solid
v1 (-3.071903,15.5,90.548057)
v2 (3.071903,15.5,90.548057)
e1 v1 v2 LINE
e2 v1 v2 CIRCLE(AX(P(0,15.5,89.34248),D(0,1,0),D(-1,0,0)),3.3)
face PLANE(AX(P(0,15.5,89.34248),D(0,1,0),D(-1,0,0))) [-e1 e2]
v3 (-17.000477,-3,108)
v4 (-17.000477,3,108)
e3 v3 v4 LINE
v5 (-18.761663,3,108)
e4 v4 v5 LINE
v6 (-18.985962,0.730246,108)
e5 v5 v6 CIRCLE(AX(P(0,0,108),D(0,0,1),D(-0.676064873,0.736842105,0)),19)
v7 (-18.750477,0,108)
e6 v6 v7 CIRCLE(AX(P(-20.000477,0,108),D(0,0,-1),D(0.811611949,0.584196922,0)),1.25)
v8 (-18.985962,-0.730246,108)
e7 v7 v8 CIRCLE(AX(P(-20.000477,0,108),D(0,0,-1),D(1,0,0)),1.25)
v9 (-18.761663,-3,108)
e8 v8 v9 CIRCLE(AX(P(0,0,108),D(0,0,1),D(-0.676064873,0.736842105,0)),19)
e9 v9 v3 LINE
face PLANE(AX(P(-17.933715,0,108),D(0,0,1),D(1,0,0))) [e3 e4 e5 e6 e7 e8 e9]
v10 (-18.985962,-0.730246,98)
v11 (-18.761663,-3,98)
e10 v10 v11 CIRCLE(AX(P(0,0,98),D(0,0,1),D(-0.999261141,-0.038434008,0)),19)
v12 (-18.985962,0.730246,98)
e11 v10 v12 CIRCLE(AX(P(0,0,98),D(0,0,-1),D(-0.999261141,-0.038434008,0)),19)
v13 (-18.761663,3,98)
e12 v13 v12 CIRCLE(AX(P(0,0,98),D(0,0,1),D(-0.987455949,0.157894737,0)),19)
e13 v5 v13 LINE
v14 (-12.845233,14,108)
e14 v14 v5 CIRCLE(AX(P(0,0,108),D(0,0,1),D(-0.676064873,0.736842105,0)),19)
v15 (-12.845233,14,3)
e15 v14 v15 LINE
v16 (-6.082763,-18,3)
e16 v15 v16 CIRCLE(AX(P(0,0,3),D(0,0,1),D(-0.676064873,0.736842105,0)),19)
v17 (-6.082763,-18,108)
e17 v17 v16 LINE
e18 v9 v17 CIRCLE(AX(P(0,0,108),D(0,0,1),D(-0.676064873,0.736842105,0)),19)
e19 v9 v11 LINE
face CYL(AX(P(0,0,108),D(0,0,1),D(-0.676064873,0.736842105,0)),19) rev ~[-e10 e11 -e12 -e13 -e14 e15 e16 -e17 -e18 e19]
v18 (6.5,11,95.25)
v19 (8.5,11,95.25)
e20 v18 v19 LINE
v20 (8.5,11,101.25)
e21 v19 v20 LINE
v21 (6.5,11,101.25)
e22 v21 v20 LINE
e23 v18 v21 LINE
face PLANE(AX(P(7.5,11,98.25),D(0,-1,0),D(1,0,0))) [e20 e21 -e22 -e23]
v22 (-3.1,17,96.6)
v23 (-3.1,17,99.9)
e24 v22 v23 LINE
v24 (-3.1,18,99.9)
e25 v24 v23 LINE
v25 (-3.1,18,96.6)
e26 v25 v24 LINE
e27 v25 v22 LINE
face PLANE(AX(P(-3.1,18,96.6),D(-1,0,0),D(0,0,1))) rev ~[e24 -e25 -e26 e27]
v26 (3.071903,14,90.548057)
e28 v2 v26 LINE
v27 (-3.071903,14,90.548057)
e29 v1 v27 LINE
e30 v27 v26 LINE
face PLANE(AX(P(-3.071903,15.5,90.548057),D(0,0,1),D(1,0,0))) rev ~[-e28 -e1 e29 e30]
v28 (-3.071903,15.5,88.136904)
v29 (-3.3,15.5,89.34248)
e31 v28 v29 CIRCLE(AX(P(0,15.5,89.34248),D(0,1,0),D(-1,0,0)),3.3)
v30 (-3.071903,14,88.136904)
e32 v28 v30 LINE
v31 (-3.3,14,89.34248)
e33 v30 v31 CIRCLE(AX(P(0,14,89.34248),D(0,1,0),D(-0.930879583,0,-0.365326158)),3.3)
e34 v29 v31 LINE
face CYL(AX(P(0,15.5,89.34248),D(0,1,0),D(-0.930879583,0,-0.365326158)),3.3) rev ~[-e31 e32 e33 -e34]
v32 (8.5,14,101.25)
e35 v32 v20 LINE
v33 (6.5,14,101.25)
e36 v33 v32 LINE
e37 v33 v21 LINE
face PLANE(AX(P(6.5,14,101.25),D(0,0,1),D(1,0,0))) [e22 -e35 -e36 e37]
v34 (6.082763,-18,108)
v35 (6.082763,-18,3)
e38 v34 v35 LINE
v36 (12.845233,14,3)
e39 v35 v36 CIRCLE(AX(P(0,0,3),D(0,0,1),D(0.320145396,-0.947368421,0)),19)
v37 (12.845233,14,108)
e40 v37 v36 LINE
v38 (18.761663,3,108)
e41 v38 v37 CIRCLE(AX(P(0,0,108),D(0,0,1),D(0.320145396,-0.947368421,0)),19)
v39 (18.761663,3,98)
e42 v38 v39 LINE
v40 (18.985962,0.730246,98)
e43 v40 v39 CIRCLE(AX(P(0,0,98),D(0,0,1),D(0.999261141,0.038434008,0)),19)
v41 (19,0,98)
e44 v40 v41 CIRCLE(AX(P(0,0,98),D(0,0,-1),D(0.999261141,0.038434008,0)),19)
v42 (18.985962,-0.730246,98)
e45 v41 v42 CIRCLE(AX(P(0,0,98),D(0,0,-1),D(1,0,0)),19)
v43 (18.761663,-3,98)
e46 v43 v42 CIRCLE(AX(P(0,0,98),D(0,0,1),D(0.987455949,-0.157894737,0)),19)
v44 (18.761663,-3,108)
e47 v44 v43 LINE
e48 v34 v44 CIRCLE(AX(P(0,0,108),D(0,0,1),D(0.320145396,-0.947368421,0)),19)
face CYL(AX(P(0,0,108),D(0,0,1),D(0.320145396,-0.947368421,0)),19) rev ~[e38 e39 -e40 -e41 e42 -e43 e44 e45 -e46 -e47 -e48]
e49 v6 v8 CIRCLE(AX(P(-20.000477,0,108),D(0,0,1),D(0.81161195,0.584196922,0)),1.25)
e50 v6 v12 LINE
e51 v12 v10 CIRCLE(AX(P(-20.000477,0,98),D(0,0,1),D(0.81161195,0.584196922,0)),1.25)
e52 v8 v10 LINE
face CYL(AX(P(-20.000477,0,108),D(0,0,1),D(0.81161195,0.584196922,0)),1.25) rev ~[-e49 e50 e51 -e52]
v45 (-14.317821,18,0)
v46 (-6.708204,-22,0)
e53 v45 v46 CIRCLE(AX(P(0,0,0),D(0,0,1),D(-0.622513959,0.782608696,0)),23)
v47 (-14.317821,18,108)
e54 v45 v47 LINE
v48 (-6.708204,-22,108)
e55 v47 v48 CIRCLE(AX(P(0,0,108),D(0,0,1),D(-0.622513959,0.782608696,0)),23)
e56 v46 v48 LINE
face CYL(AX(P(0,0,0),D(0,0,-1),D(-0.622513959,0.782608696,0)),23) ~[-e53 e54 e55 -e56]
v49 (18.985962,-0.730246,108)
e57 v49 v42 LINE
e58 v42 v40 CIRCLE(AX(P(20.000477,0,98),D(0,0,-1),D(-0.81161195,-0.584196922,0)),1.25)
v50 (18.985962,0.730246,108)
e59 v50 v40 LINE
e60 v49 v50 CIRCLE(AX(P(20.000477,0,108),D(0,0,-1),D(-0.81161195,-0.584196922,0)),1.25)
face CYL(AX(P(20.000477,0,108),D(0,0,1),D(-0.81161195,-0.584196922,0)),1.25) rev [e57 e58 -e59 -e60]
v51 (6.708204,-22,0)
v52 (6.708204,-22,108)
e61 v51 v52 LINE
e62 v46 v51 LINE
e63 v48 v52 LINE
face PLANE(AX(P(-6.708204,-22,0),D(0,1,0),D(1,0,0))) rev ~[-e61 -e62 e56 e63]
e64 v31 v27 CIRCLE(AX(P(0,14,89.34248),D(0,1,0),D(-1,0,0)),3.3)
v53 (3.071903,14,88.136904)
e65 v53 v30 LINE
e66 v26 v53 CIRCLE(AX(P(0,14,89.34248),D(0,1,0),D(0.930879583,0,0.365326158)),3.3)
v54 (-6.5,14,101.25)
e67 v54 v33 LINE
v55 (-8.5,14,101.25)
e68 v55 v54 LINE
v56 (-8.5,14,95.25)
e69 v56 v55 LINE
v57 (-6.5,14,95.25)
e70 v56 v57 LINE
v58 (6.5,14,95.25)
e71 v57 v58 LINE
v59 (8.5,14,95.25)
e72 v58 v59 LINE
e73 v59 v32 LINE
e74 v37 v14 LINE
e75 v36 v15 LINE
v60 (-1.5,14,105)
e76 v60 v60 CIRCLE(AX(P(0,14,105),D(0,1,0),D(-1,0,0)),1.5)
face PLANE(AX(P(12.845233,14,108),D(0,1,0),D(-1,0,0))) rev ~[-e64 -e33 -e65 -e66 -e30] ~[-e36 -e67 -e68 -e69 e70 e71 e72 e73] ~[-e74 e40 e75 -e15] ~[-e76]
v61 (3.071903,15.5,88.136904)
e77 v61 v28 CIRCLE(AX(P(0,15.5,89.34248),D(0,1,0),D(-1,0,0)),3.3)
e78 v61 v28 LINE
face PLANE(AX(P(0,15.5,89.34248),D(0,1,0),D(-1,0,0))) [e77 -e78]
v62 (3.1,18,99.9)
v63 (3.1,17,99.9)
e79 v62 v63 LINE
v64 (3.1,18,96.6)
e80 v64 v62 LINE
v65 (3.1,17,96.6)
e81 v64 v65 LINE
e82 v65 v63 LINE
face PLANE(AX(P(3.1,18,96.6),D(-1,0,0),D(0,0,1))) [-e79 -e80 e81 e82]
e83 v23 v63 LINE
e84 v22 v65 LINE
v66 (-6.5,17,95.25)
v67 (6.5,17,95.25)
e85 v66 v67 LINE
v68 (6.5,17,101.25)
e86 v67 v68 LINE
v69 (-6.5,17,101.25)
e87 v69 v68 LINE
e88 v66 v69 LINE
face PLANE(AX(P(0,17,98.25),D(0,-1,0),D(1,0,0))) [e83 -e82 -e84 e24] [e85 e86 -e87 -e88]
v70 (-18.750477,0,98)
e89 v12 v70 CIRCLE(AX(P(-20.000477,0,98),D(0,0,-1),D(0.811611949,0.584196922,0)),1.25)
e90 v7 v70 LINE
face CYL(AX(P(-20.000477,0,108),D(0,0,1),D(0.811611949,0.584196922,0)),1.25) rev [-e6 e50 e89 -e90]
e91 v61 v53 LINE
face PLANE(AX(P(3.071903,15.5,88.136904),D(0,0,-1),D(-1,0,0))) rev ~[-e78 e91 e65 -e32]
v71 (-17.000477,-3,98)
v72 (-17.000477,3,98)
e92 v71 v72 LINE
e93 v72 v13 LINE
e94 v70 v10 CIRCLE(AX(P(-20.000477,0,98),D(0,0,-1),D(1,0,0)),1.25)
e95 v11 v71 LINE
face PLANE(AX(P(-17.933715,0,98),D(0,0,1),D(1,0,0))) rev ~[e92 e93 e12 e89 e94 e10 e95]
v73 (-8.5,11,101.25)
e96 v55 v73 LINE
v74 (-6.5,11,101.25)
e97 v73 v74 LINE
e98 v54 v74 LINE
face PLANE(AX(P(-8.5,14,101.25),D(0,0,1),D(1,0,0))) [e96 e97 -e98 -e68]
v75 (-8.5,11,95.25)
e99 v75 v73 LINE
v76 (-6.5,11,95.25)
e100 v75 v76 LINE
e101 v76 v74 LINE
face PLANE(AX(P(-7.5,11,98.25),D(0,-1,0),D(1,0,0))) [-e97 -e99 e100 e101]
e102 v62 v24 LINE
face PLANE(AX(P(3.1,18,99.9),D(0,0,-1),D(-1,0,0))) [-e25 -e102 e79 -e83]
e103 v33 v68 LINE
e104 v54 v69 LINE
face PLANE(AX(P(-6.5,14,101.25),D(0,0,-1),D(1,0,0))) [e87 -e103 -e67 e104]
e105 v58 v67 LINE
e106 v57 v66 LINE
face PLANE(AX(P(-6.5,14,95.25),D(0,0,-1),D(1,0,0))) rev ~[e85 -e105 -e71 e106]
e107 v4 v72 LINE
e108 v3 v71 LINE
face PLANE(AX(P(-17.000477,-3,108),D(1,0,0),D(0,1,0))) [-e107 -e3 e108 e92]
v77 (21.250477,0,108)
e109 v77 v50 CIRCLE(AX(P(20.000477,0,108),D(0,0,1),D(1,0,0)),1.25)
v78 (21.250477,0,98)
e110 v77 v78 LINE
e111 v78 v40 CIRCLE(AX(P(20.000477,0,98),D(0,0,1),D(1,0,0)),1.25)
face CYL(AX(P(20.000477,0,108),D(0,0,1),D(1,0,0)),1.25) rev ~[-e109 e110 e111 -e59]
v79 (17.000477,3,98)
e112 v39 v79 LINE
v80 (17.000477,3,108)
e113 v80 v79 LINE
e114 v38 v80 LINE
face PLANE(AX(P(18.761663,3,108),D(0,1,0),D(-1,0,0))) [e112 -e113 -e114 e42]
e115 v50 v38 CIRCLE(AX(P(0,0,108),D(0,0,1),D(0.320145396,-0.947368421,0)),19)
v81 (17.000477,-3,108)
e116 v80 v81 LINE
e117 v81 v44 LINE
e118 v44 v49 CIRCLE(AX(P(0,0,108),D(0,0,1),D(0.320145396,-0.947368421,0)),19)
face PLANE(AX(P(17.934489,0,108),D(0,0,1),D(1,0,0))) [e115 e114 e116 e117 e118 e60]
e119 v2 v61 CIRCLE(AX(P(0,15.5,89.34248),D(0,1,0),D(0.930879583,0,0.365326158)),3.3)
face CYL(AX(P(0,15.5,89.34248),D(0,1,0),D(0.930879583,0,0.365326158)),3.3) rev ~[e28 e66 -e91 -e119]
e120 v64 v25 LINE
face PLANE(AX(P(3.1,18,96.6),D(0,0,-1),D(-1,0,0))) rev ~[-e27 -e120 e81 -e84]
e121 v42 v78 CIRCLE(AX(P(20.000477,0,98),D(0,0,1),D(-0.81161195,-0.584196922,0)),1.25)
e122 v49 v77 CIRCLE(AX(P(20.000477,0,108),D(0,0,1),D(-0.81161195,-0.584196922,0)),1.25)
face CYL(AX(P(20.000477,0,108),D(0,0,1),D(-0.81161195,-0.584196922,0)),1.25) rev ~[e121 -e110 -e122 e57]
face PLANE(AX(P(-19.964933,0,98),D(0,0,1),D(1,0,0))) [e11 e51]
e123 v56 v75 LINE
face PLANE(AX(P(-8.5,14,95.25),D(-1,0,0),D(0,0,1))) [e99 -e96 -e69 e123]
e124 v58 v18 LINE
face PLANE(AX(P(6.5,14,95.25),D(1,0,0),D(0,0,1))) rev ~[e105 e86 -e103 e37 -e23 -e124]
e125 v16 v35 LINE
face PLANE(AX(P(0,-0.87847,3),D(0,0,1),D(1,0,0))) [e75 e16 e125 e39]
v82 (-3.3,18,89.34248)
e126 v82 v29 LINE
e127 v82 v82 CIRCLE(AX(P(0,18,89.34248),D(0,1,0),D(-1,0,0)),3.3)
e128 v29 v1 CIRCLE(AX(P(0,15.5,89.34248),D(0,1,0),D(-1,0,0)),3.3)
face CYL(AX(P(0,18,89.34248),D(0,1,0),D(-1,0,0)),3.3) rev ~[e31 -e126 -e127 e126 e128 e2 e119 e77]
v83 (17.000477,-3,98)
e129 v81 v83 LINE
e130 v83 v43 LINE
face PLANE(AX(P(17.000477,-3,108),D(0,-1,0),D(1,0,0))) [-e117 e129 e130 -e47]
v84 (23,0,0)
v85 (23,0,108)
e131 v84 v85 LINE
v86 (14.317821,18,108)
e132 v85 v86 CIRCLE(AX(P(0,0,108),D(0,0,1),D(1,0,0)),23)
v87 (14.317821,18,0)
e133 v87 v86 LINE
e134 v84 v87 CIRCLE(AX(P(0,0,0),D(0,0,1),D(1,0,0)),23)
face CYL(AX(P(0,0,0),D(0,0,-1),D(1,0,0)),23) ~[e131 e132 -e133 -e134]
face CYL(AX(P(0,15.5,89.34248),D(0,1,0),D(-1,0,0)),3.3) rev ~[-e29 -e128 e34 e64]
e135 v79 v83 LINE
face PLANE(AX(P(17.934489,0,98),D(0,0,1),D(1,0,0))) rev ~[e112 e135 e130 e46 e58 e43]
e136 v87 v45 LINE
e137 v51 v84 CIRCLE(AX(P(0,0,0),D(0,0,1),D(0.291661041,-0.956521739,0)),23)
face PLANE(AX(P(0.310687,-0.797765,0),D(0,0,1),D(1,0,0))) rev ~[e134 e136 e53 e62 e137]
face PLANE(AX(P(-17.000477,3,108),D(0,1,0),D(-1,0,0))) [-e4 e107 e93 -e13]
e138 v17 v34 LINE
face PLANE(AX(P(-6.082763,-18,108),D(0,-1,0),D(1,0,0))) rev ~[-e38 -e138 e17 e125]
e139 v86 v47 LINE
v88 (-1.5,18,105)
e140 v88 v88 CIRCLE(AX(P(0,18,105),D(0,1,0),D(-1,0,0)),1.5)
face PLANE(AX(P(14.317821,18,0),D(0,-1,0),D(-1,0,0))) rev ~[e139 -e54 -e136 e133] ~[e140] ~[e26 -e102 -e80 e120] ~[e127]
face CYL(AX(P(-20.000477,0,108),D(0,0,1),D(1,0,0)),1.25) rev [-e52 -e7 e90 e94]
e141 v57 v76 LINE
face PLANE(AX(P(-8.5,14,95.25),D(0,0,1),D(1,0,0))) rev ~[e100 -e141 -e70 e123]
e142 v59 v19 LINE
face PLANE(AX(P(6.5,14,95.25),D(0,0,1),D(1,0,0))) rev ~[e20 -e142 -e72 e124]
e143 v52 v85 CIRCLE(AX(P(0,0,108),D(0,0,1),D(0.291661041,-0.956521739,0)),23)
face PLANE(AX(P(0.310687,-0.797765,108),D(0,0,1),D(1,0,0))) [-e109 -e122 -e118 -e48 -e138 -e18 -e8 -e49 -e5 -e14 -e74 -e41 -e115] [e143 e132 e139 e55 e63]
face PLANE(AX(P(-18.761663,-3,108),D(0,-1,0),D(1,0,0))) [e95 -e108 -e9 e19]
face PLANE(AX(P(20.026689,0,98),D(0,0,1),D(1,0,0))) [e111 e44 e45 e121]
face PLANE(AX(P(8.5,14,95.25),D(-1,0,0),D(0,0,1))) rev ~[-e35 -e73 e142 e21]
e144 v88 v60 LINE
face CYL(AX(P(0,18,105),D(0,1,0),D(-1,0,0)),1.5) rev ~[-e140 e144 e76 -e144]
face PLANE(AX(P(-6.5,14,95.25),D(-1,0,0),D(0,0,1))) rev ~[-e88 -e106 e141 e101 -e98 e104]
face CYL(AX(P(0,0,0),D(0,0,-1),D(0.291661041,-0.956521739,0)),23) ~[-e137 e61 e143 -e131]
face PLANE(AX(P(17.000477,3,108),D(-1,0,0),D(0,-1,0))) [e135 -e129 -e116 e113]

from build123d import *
from build123d import SkipClean  # not in build123d's __all__

# Parameters (mm, degrees)
F1_DEPTH  = 108
F3_DEPTH  = 105
F4_W      = 6.2
F4_H      = 3.3
F5_DEPTH  = 4
F4_R      = 3.3
F6_DEPTH  = 2.5
F8_DEPTH  = 1.5
F4_R_2    = 1.5
F9_DEPTH  = 4
F10_W     = 13
F10_H     = 6
F10_W_2   = 6.2
F10_H_2   = 3.3
F11_DEPTH = 3
F10_W_3   = 2
F12_DEPTH = 3
F14_DEPTH = 10
F15_DEPTH = 10


# Not quite as in the source:
# - a feature names something its author has since deleted; it is built from what else it names


with BuildPart() as f1:
    # F0 (on Top) → F1 (new body)
    with BuildSketch(Plane.XY):
        with BuildLine():
            ThreePointArc((6.7082039325, -22), (18.4836237038, -13.6877921805), (23, 0))
            ThreePointArc((23, 0), (20.7160551802, 9.9922498854), (14.3178210633, 18))
            Line((14.3178210633, 18), (-14.3178210633, 18))
            ThreePointArc((-14.3178210633, 18), (-22.5947655837, -4.2984378813), (-6.7082039325, -22))
            Line((-6.7082039325, -22), (6.7082039325, -22))
        make_face()
    extrude(amount=F1_DEPTH)

    # F2 (on face) → F3 (cut)
    with BuildSketch(Plane.XY.offset(108)):
        with BuildLine():
            Line((-6.0827625303, -18), (6.0827625303, -18))
            ThreePointArc((6.0827625303, -18), (18.5894391984, -3.9284539311), (12.8452325787, 14))
            Line((12.8452325787, 14), (-12.8452325787, 14))
            ThreePointArc((-12.8452325787, 14), (-18.5894391984, -3.9284539311), (-6.0827625303, -18))
        make_face()
    extrude(amount=-F3_DEPTH, mode=Mode.SUBTRACT)

    # F4 (on face) → F5 (cut)
    with BuildSketch(Plane(origin=(0, 18, 0), x_dir=(-1, 0, 0), z_dir=(0, 1, 0))):
        with Locations((0, 98.25)):
            Rectangle(F4_W, F4_H)
    extrude(amount=-F5_DEPTH, mode=Mode.SUBTRACT)

    # F4 (on face) → F6 (cut)
    with BuildSketch(Plane(origin=(0, 18, 0), x_dir=(-1, 0, 0), z_dir=(0, 1, 0))):
        with Locations((0, 89.3424802274)):
            Circle(F4_R)
    extrude(amount=-F6_DEPTH, mode=Mode.SUBTRACT)

    # F7 (on face) → F8 (cut)
    with BuildSketch(Plane(origin=(0, 15.5, 0), x_dir=(-1, 0, 0), z_dir=(0, 1, 0))):
        with BuildLine():
            ThreePointArc((3.3, 89.3424802274), (3.2424742607, 89.9559626385), (3.0719026249, 90.5480565471))
            Line((3.0719026249, 90.5480565471), (-3.0719026249, 90.5480565471))
            ThreePointArc((-3.0719026249, 90.5480565471), (-3.3, 89.3424802274), (-3.0719026249, 88.1369039076))
            Line((-3.0719026249, 88.1369039076), (3.0719026249, 88.1369039076))
            ThreePointArc((3.0719026249, 88.1369039076), (3.2424742607, 88.7289978162), (3.3, 89.3424802274))
        make_face()
    extrude(amount=-F8_DEPTH, mode=Mode.SUBTRACT)

    # F4 (on face) → F9 (cut)
    with BuildSketch(Plane(origin=(0, 18, 0), x_dir=(-1, 0, 0), z_dir=(0, 1, 0))):
        with Locations((0, 105)):
            Circle(F4_R_2)
    extrude(amount=-F9_DEPTH, mode=Mode.SUBTRACT)

    # F10 (on face) → F11 (cut)
    with BuildSketch(Plane.XZ.offset(-14)):
        with Locations((0, 98.25)):
            Rectangle(F10_W, F10_H)
        with Locations((0, 98.25)):
            Rectangle(F10_W_2, F10_H_2, mode=Mode.SUBTRACT)
    extrude(amount=-F11_DEPTH, mode=Mode.SUBTRACT)

    # F10 (on face) → F12 (join)
    with BuildSketch(Plane.XZ.offset(-14)):
        with Locations((-7.5, 98.25)):
            Rectangle(F10_W_3, F10_H)
        with Locations((7.5, 98.25)):
            Rectangle(F10_W_3, F10_H)
    extrude(amount=F12_DEPTH)

    # F13 (on face) → F14 (cut)
    with BuildSketch(Plane.XY.offset(108)):
        with BuildLine():
            ThreePointArc((21.2504766076, 0), (20.3841146719, 1.1896729952), (18.9859616706, 0.7302461521))
            ThreePointArc((18.9859616706, 0.7302461521), (18.9964900935, 0.3651905384), (19, 0))
            ThreePointArc((19, 0), (18.9964900935, -0.3651905384), (18.9859616706, -0.7302461521))
            ThreePointArc((18.9859616706, -0.7302461521), (20.3841146719, -1.1896729952), (21.2504766076, 0))
        make_face()
        with BuildLine():
            ThreePointArc((-18.9859616706, -0.7302461521), (-19, 0), (-18.9859616706, 0.7302461521))
            ThreePointArc((-18.9859616706, 0.7302461521), (-21.2504766076, 0), (-18.9859616706, -0.7302461521))
        make_face()
    extrude(amount=-F14_DEPTH, mode=Mode.SUBTRACT)

    # F13 (on face) → F15 (join)
    with BuildSketch(Plane.XY.offset(108)):
        with BuildLine():
            ThreePointArc((18.9859616706, 0.7302461521), (18.9079014817, 1.8684917869), (18.7616630393, 3))
            Line((18.7616630393, 3), (17.0004766076, 3))
            Line((17.0004766076, 3), (17.0004766076, -3))
            Line((17.0004766076, -3), (18.7616630393, -3))
            ThreePointArc((18.7616630393, -3), (18.9079014817, -1.8684917869), (18.9859616706, -0.7302461521))
            ThreePointArc((18.9859616706, -0.7302461521), (18.7504766076, 0), (18.9859616706, 0.7302461521))
        make_face()
        with BuildLine():
            Line((-17.0004766076, 3), (-18.7616630393, 3))
            ThreePointArc((-18.7616630393, 3), (-18.9079014817, 1.8684917869), (-18.9859616706, 0.7302461521))
            ThreePointArc((-18.9859616706, 0.7302461521), (-18.8108036123, 0.3836380643), (-18.7504766076, 0))
            ThreePointArc((-18.7504766076, 0), (-18.8108036123, -0.3836380643), (-18.9859616706, -0.7302461521))
            ThreePointArc((-18.9859616706, -0.7302461521), (-18.9079014817, -1.8684917869), (-18.7616630393, -3))
            Line((-18.7616630393, -3), (-17.0004766076, -3))
            Line((-17.0004766076, -3), (-17.0004766076, 3))
        make_face()
    with SkipClean():  # cleaning this boolean's faces spoils the solid; the shape is the same uncleaned
        extrude(amount=-F15_DEPTH)


solid = f1.part
